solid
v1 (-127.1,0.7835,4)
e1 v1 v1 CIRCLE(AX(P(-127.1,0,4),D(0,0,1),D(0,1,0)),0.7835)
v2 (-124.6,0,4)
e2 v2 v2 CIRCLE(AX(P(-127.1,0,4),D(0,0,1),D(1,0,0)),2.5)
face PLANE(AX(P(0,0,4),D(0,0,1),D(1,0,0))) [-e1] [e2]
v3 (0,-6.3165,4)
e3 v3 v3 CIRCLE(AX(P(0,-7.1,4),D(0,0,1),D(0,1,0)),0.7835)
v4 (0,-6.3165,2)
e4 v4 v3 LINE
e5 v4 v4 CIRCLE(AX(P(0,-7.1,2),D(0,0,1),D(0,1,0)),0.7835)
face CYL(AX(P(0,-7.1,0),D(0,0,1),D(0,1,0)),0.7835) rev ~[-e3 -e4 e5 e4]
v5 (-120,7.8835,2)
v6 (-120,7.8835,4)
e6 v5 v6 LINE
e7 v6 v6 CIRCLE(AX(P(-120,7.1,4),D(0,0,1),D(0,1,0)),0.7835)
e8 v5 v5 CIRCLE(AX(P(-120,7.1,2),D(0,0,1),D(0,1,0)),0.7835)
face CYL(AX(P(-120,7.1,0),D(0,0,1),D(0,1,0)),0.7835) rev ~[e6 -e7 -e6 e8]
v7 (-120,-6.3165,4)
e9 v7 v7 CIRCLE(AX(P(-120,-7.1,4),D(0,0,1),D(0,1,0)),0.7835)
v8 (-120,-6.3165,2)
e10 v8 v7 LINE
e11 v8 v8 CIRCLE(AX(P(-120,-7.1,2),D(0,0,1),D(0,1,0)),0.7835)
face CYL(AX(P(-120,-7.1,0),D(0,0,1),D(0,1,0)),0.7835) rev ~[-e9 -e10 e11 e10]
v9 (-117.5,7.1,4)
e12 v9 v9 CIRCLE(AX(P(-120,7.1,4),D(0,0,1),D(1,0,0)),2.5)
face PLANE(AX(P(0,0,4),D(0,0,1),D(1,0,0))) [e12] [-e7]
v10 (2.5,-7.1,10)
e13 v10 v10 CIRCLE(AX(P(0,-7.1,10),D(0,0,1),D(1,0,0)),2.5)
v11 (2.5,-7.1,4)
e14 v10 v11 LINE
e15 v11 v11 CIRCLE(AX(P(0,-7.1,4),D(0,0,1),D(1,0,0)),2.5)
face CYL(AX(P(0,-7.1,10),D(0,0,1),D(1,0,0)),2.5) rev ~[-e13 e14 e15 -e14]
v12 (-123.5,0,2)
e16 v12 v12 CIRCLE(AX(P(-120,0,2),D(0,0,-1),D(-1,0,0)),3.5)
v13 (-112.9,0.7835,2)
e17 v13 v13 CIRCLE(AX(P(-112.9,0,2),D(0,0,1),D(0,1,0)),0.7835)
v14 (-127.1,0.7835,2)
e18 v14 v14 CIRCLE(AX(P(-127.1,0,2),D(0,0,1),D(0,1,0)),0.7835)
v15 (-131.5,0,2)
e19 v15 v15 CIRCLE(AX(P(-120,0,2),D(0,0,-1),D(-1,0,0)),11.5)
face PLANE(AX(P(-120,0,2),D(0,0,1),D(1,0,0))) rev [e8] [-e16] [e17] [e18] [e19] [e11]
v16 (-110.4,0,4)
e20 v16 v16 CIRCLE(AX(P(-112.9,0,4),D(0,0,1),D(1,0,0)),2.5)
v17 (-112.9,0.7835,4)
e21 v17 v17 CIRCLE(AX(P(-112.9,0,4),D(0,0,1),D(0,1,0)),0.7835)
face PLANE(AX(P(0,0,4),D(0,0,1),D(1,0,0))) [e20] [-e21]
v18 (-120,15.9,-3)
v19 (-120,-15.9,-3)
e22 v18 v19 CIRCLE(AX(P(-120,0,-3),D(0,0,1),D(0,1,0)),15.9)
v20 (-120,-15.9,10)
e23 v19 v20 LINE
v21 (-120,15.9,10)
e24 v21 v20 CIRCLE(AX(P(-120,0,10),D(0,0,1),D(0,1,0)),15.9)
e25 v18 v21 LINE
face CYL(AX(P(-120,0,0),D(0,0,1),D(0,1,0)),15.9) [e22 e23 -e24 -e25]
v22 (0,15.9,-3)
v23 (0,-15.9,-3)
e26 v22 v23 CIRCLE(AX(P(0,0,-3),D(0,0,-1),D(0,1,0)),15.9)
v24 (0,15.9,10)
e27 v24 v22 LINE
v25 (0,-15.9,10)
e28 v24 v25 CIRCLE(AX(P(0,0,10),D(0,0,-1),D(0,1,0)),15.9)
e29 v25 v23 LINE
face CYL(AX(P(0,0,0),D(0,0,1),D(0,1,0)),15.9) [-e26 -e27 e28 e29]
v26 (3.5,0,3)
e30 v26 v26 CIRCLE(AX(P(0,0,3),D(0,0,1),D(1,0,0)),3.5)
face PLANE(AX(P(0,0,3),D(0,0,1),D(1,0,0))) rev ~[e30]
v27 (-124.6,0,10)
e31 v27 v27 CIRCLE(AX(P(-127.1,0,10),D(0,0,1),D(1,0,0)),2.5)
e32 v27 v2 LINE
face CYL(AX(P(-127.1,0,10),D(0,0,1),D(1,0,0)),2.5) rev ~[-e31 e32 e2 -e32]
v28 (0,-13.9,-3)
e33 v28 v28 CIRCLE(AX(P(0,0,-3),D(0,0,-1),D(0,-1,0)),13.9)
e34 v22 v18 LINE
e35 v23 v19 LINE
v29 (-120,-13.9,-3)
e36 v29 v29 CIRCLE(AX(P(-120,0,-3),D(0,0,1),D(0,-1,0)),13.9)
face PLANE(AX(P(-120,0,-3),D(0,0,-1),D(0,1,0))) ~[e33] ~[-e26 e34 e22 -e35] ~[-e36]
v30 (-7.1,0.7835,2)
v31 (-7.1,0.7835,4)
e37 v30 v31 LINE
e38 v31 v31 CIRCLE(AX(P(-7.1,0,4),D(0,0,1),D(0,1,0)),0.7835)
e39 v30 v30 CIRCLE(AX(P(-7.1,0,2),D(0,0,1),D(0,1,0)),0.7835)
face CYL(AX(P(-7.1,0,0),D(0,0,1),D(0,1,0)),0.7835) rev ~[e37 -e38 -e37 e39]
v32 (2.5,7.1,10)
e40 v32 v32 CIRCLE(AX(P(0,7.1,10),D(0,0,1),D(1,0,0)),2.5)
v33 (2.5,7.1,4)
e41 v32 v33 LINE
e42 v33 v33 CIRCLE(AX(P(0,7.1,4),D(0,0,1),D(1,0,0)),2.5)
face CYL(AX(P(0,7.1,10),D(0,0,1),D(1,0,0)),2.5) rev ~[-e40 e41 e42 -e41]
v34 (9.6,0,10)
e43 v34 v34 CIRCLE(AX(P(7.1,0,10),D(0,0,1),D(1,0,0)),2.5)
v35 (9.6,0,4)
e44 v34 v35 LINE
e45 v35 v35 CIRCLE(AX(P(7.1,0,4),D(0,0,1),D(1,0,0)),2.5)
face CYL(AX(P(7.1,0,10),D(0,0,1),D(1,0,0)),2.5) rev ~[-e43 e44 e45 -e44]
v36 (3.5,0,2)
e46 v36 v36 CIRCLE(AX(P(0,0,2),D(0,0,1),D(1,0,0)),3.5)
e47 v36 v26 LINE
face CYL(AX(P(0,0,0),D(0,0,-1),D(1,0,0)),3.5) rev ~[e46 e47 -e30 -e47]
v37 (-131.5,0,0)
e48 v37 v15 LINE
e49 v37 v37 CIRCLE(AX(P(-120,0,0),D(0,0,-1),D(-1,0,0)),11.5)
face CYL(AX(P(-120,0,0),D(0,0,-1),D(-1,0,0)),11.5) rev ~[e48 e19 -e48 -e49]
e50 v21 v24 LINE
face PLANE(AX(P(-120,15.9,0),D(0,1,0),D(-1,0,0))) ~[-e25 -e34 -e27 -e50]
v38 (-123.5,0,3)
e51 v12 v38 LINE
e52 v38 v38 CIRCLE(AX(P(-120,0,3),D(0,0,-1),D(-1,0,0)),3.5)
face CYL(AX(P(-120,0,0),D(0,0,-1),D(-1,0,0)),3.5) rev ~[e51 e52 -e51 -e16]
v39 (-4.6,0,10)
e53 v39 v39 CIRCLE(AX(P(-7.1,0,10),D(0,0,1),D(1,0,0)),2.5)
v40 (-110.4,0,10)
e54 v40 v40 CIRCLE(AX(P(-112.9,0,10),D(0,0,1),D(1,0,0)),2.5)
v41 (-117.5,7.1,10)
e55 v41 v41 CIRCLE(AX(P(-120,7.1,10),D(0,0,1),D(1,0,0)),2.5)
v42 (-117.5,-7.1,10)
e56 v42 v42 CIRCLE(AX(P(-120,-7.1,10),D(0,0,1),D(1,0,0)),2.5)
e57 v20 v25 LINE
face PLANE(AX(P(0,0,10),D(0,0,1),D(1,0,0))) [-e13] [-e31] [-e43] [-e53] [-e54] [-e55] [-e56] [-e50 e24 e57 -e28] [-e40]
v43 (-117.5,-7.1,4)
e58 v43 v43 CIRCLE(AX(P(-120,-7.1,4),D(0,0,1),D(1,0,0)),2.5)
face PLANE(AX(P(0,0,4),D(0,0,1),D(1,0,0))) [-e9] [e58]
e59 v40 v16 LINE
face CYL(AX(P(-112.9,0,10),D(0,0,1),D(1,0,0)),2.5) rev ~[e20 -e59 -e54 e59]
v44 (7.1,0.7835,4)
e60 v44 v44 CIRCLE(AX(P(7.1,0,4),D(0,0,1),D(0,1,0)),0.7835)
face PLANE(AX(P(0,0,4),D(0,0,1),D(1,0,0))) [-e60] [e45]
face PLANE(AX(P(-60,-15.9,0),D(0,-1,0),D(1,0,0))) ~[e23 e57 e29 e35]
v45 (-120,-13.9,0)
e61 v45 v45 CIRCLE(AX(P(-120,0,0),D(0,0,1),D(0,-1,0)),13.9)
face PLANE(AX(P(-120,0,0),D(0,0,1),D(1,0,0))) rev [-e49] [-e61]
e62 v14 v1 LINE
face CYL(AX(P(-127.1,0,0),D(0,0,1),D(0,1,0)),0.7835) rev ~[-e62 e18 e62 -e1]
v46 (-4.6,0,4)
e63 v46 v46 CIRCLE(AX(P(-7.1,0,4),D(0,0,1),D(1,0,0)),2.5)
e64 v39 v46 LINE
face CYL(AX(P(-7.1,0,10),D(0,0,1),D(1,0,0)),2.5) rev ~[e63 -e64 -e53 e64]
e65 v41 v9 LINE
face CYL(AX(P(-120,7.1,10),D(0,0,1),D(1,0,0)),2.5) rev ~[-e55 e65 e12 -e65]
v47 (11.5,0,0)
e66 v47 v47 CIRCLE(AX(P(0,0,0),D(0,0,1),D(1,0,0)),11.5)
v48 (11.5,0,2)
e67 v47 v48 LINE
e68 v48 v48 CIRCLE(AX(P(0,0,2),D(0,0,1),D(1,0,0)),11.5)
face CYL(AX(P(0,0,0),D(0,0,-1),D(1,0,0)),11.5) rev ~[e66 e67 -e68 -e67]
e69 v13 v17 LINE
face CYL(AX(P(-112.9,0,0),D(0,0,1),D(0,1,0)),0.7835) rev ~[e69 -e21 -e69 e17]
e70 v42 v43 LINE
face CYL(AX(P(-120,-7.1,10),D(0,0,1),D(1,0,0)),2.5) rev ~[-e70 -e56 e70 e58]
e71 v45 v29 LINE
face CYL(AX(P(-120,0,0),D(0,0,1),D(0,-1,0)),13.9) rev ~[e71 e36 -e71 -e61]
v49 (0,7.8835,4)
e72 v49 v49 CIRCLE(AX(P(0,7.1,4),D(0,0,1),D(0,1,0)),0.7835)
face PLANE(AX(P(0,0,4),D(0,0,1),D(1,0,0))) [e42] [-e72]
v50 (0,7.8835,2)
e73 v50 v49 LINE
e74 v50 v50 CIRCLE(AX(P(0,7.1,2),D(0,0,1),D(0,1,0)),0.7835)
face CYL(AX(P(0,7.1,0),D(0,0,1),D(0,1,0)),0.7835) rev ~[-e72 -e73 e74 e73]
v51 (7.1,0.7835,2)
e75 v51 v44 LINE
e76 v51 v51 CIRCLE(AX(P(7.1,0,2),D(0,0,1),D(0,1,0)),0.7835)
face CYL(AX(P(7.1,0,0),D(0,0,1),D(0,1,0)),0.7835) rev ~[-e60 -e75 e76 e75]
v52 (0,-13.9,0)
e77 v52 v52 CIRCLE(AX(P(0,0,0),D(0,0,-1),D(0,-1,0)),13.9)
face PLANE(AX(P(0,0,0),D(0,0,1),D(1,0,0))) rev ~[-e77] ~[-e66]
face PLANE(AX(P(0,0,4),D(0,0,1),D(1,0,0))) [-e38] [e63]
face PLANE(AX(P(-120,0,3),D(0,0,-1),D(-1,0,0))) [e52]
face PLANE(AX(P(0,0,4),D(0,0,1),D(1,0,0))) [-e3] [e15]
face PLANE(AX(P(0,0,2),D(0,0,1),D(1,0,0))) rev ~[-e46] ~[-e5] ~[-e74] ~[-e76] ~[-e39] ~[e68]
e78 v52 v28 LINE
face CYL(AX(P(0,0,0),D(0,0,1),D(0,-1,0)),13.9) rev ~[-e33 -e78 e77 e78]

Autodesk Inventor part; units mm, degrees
ref_plane "YZ Plane" through (0, 0, 0) normal (1, 0, 0) x (0, 1, 0)
ref_plane "XZ Plane" through (0, 0, 0) normal (0, 1, 0) x (-1, 0, 0)
sketch "Szkic1" plane through (0, 0, 0) normal (0, 0, 1) x (1, 0, 0)
  circle A0 centre (0, 0) radius 3.5
  circle A1 centre (0, 0) radius 15.9
  circle A2 centre (0, 0) radius 11.5
  line L0 (0, -15.9) -> (-60, -15.9)
  line L1 (0, 15.9) -> (-60, 15.9)
  line L2 (-60, 15.9) -> (-60, -15.9)
  point P0 (0, 7.1)
  point P1 (-7.1, 0)
  point P2 (7.1, 0)
  point P3 (0, -7.1)
  dimension "d0" = 7
  dimension "d1" = 7.1
  dimension "d2" = 7.1
  dimension "d3" = 7.1
  dimension "d4" = 7.1
  dimension "d5" = 31.8
  dimension "d6" = 23
  dimension "d23" = 60
extrude "Wyciągnięcie proste1" add sketch "Szkic1" along normal blind 10 contours A0 | A1 | A1 L0 L2 L1 | A2
extrude "Wyciągnięcie proste2" cut sketch "Szkic1" along normal blind 2 contours A2
extrude "Wyciągnięcie proste3" cut sketch "Szkic1" along normal blind 3 contours A0
hole "Otwór1" at (0, 7.1, 0) at (-7.1, 0, 0) at (7.1, 0, 0) at (0, -7.1, 0) direction (0, 0, 1) diameter 1.567 end through all thread size "M2x0.4" designation "M2" class "6H" standard "GB Metric profile"
sketch "Szkic2" plane through (0, 0, 0) normal (0, 0, -1) x (0, -1, 0)
  arc A0 (-15.9, 0) -> (15.9, 0) centre (0, 0) ccw projected
  circle A1 centre (0, 0) radius 11.5 projected
  circle A2 centre (0, 0) radius 13.9
  line L0 (15.9, 60) -> (15.9, 0) projected
  line L1 (-15.9, 60) -> (15.9, 60) projected
  line L2 (-15.9, 0) -> (-15.9, 60) projected
  dimension "d20" = 2
extrude "Wyciągnięcie proste4" add sketch "Szkic2" along normal blind 3 contours L2 L1 L0 A0
ref_plane "Płaszczyzna konstrukcyjna2" through (-60, 15.9, 10) normal (1, 0, 0) x (0, -1, 0)
mirror "Odbij1" about plane through (-60, 15.9, 0) normal (-1, 0, 0) of "Wyciągnięcie proste4", "Otwór1", "Wyciągnięcie proste1", "Wyciągnięcie proste2"
sketch "Szkic4" plane through (-120, 0, 0) normal (0, 0, -1) x (-1, 0, 0)
  circle A0 centre (0, 0) radius 3.5 projected
  point P0 (-120, 0)
extrude "Wyciągnięcie proste5" cut sketch "Szkic4" against normal blind 3
sketch "Szkic5" plane through (0, 0, 10) normal (0, 0, 1) x (1, 0, 0)
  circle A0 centre (-127.1, 0) radius 0.7835 projected
  circle A1 centre (-120, -7.1) radius 0.7835 projected
  circle A2 centre (-112.9, 0) radius 0.7835 projected
  circle A3 centre (-120, 7.1) radius 0.7835 projected
  circle A4 centre (7.1, 0) radius 0.7835 projected
  circle A5 centre (0, 7.1) radius 0.7835 projected
  circle A6 centre (-7.1, 0) radius 0.7835 projected
  circle A7 centre (0, -7.1) radius 0.7835 projected
  arc A8 (0, -15.9) -> (0, 15.9) centre (0, 0) ccw projected
  line L0 (0, 15.9) -> (-120, 15.9) projected
  arc A9 (-120, 15.9) -> (-120, -15.9) centre (-120, 0) ccw projected
  line L1 (0, -15.9) -> (-120, -15.9) projected
  circle A10 centre (0, 7.1) radius 2.5
  circle A11 centre (7.1, 0) radius 2.5
  circle A12 centre (0, -7.1) radius 2.5
  circle A13 centre (-7.1, 0) radius 2.5
  circle A14 centre (-120, 7.1) radius 2.5
  circle A15 centre (-112.9, 0) radius 2.5
  circle A16 centre (-120, -7.1) radius 2.5
  circle A17 centre (-127.1, 0) radius 2.5
  dimension "d27" = 5
  dimension "d28" = 5
  dimension "d29" = 5
  dimension "d30" = 5
  dimension "d31" = 5
  dimension "d32" = 5
  dimension "d33" = 5
  dimension "d34" = 5
extrude "Wyciągnięcie proste6" cut sketch "Szkic5" against normal blind 6 contours A0 | A1 | A2 | A3 | A4 | A5 | A6 | A7 | A10 | A11 | A12 | A13 | A14 | A15 | A16 | A17
equation "\"d2\" = d1"
equation "\"d3\" = d2"
equation "\"d4\" = d1"
equation "\"d18\" = d1"
properties part number "Ramie2_Drukowanie 3D"
